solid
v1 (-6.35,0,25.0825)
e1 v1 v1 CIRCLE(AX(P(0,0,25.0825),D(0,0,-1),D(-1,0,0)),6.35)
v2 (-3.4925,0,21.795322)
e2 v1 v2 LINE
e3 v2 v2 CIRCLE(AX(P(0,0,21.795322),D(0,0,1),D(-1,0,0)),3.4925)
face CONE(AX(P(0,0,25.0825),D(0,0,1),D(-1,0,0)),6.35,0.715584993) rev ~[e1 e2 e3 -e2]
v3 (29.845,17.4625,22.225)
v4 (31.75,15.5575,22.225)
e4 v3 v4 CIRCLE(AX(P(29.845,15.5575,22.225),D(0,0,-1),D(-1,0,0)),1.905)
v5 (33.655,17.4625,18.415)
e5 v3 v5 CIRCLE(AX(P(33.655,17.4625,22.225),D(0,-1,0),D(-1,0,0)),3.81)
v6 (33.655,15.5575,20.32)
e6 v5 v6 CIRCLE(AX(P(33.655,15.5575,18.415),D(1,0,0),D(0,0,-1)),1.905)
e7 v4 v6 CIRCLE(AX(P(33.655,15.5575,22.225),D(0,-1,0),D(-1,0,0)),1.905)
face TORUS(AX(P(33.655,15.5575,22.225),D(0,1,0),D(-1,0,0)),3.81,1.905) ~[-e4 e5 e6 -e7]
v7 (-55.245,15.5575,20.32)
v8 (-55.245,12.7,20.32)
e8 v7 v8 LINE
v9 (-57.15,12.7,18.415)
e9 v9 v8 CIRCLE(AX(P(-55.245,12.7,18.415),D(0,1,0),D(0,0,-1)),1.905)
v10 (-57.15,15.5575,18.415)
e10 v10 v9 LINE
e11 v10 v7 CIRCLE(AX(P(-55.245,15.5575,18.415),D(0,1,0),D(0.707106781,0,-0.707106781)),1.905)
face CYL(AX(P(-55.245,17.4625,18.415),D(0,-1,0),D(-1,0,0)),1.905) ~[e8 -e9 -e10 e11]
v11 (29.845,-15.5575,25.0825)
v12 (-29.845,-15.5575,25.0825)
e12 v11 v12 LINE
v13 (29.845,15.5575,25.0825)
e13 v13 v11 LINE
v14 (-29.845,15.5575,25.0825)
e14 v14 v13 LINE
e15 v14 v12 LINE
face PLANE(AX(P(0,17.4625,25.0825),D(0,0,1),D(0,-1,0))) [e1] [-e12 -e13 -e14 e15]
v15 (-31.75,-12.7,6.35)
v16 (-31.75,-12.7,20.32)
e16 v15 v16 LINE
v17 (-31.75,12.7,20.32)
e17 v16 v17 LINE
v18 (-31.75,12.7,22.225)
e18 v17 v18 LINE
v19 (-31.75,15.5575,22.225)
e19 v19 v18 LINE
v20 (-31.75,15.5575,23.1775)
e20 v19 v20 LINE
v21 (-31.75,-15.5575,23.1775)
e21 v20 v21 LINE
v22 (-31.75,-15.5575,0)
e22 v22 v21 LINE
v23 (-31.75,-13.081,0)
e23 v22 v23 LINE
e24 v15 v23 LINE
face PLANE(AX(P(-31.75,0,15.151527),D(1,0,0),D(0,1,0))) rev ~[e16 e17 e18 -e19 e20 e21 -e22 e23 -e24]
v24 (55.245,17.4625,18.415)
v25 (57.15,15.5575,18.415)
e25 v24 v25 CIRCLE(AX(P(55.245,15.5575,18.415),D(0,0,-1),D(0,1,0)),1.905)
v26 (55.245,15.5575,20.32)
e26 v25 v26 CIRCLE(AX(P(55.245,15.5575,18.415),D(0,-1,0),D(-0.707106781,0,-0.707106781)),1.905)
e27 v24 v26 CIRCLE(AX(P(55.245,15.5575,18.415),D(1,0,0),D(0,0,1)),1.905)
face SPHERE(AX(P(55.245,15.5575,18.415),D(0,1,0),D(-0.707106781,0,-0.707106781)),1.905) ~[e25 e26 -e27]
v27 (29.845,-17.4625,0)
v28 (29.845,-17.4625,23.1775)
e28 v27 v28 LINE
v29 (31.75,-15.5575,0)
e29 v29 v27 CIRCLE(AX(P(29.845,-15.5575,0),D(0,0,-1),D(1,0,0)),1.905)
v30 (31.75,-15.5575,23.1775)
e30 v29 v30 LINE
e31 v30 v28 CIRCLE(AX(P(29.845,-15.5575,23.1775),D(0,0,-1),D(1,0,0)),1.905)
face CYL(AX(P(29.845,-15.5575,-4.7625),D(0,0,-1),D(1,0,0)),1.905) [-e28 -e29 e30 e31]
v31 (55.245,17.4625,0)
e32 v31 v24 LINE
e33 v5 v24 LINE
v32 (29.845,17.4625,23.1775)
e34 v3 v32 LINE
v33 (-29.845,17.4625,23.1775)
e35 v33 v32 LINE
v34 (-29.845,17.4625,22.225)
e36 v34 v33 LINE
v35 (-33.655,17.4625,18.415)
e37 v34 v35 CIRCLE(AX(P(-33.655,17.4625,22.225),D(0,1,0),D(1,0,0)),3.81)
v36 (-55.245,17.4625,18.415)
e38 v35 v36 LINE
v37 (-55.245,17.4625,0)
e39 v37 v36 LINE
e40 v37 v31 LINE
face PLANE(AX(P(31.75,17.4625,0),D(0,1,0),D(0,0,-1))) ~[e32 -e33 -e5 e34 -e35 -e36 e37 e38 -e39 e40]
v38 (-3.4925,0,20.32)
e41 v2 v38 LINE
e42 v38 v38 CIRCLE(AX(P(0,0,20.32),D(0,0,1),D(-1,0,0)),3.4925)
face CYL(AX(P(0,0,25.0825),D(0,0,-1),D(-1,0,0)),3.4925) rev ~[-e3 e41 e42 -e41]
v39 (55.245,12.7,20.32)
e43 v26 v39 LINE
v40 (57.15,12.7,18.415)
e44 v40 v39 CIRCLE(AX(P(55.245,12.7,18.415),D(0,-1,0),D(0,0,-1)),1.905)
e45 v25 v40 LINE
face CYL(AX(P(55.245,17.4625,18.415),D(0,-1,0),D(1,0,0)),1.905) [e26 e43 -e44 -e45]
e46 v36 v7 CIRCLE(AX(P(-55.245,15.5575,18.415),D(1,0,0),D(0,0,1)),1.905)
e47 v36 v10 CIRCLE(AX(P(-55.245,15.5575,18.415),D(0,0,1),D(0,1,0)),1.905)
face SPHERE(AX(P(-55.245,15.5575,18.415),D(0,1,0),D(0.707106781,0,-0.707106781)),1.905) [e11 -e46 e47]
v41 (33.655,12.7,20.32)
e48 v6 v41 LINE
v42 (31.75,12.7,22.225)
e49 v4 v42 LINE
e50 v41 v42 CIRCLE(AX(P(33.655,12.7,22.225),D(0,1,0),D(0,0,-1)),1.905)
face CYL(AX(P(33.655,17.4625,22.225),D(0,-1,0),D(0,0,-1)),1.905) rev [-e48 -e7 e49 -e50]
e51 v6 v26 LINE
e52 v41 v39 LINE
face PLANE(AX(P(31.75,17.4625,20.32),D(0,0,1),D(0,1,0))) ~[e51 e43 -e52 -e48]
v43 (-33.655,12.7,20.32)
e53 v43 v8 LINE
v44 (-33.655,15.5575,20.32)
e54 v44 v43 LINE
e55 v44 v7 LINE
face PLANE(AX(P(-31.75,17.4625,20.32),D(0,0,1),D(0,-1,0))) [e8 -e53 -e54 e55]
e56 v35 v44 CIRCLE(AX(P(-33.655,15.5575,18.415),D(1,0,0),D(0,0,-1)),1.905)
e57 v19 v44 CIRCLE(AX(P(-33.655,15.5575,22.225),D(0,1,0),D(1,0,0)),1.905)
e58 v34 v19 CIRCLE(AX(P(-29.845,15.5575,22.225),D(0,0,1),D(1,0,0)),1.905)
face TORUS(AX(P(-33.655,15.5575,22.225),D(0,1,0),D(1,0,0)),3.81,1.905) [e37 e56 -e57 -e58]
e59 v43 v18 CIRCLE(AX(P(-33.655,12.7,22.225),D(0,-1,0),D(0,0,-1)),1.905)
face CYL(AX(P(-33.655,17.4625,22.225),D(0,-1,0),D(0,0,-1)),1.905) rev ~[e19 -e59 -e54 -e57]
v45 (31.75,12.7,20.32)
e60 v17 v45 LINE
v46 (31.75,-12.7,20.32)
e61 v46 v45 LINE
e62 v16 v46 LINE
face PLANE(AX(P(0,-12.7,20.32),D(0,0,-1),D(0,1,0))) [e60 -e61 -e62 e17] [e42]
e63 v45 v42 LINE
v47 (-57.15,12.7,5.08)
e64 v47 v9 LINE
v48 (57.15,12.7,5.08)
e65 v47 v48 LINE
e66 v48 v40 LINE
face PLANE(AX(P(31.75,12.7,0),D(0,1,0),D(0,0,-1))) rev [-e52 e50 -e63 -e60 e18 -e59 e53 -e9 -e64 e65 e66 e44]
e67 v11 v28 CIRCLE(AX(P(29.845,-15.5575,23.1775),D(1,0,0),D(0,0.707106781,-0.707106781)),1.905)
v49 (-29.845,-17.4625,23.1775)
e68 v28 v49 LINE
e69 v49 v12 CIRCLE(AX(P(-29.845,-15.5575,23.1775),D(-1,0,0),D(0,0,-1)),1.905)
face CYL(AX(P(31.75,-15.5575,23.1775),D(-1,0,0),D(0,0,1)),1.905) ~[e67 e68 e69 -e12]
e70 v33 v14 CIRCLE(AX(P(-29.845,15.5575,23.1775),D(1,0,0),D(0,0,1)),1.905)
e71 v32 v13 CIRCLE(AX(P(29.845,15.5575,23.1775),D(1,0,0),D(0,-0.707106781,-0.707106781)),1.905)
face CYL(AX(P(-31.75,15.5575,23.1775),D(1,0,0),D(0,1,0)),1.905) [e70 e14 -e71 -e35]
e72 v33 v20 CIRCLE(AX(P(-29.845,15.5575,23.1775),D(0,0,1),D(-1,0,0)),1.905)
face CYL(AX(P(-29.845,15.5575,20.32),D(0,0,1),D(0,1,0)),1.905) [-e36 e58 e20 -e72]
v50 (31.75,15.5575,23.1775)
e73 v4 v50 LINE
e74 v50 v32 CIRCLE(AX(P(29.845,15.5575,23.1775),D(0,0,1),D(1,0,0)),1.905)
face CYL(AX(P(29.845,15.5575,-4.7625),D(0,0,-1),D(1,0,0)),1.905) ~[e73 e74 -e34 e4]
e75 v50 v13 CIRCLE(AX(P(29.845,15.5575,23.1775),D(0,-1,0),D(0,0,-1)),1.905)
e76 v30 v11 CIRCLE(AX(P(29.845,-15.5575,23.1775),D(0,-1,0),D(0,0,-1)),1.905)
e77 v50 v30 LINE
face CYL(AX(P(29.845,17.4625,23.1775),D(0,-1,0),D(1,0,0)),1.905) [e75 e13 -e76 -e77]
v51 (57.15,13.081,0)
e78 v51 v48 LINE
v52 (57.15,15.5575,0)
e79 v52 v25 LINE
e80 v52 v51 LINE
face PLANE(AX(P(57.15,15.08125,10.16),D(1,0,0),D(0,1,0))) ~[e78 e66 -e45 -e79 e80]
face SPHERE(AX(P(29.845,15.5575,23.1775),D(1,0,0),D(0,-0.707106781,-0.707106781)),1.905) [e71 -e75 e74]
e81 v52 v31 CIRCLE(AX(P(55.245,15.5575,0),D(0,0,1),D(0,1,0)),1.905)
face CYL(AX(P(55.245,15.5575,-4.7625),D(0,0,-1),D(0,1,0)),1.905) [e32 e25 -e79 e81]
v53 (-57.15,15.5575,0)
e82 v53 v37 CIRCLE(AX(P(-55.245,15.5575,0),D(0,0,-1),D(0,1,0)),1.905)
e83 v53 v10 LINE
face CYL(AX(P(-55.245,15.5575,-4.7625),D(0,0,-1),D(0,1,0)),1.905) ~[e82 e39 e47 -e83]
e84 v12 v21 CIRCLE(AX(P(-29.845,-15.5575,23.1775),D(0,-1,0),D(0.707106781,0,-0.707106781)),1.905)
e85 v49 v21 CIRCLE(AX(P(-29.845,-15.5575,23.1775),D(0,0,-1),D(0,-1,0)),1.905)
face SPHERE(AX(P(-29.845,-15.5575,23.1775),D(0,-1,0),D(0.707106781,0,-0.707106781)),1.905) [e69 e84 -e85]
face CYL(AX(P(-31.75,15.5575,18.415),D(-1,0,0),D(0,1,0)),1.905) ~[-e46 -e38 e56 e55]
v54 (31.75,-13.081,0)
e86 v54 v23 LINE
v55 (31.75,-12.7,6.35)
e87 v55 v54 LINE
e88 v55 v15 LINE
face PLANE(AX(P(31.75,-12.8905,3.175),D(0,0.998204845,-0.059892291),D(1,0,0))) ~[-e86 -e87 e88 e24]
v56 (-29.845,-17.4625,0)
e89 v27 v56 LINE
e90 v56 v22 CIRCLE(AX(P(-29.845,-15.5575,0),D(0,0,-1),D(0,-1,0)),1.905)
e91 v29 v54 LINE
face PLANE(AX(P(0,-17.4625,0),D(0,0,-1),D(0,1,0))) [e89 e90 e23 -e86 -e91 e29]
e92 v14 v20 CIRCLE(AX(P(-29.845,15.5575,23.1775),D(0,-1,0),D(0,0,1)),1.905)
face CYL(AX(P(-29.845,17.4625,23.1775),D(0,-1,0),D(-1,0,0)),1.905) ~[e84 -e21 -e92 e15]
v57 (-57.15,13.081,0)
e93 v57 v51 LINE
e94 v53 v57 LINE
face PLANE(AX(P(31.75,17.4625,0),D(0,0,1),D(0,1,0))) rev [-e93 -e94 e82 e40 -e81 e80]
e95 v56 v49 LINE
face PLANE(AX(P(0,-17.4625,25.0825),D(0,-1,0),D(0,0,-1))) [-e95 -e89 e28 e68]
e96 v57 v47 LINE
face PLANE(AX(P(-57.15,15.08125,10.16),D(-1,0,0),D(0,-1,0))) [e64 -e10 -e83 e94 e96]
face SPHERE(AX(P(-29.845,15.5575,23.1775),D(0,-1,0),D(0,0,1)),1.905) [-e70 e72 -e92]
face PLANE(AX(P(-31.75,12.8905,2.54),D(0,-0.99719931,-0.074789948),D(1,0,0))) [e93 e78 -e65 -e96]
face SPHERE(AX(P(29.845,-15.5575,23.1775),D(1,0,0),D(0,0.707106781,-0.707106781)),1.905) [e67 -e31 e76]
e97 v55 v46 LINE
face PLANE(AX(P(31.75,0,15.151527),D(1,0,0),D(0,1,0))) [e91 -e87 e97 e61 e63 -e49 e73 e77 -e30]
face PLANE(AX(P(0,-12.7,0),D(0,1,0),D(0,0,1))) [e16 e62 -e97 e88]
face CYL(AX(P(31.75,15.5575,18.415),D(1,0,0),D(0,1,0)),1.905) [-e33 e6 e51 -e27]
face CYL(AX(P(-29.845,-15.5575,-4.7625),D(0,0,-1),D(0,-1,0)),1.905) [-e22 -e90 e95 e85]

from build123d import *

# Parameters (mm, degrees)
F1_DEPTH       = 31.75
F4_D           = 6.985
F4_DEPTH       = 12.7
F4_CSINK_D     = 12.7
F4_CSINK_ANGLE = 82
F4_TIP         = 2.098505712
F5_SIZE2       = 0.381
F5_SIZE        = 6.35
F2_W           = 4.7625
F2_H           = 20.32
F6_DEPTH       = 25.4
F7_SIZE2       = 5.08
F7_SIZE        = 0.381
F8_R           = 1.905
F9_T1_DEPTH    = 23.1775
F9_T3_DEPTH    = 27.94
F9_S7_W        = 1.905
F9_S7_H        = 1.905
F9_T8_DEPTH    = 1.905
F9_S13_W       = 1.905
F9_S13_H       = 1.905
F9_T14_DEPTH   = 1.905
F9_S19_W       = 1.905
F9_S19_H       = 1.905
F9_T20_DEPTH   = 1.905
F9_S25_W       = 1.905
F9_S25_H       = 1.905
F9_T26_DEPTH   = 1.905


# Not quite as in the source:
# - a fillet or chamfer that OpenCascade refuses, or shapes differently, is made with other operations: its cross-section is extruded or revolved along the edge and cut away or added


with BuildPart() as f1:
    # F0 (on Right) → F1 (new body, symmetric)
    with BuildSketch(Plane.YZ):
        Polygon((-12.7, 0), (-12.7, 20.32), (12.7, 20.32), (12.7, 0), (17.4625, 0), (17.4625, 25.0825), (-17.4625, 25.0825), (-17.4625, 0), align=None)
    extrude(amount=F1_DEPTH, both=True)

    # F4
    with Locations(Plane.XY.offset(25.0825)):
        with Locations((0, 0)):
            CounterSinkHole(F4_D / 2, F4_CSINK_D / 2, depth=F4_DEPTH, counter_sink_angle=F4_CSINK_ANGLE)
            with Locations((0, 0, -(F4_DEPTH + F4_TIP / 2))):  # 118° drill point
                Cone(0, F4_D / 2, F4_TIP, mode=Mode.SUBTRACT)

    # F5
    f5_edges = [f1.edges().sort_by_distance(p)[0] for p in [
        (0, -12.7, 0),
    ]]
    f5_side = f1.faces().sort_by_distance((0, -12.7, 10.16))[0]
    chamfer(f5_edges, length=F5_SIZE, length2=F5_SIZE2, reference=f5_side)

    # F2 (on face) → F6 (join)
    with BuildSketch(Plane(origin=(-31.75, 0, 0), x_dir=(0, -1, 0), z_dir=(-1, 0, 0))):
        with Locations((-15.08125, 10.16)):
            Rectangle(F2_W, F2_H)
    extrude(amount=F6_DEPTH)

    # F7
    f7_edges = [f1.edges().sort_by_distance(p)[0] for p in [
        (-12.7, 12.7, 0),
    ]]
    chamfer(f7_edges, length=F7_SIZE, length2=F7_SIZE2)

    # F8
    f8_edges = [f1.edges().sort_by_distance(p)[0] for p in [
        (-31.75, 0, 25.0825),
        (-31.75, 15.08125, 20.32),
        (-57.15, 15.08125, 20.32),
        (31.75, 0, 25.0825),
        (0, 17.4625, 25.0825),
        (-31.75, 17.4625, 22.70125),
        (-44.45, 17.4625, 20.32),
        (0, -17.4625, 25.0825),
    ]]
    fillet(f8_edges, radius=F8_R)

    # F9: fillet of radius 1.905 on 4 edges, made by hand

    # F9_s2 → F9_t1 (cut)
    with BuildSketch(Plane.XY.offset(-4.7625)):
        with BuildLine():
            ThreePointArc((-55.245, 17.4625), (-56.5920384182, 16.9045384182), (-57.15, 15.5575))
            Line((-57.15, 15.5575), (-57.15, 17.4625))
            Line((-57.15, 17.4625), (-55.245, 17.4625))
        make_face()
    extrude(amount=F9_T1_DEPTH, mode=Mode.SUBTRACT)

    # F9_s4 → F9_t3 (cut)
    with BuildSketch(Plane.XY.offset(-4.7625)):
        with BuildLine():
            ThreePointArc((31.75, 15.5575), (31.1920384182, 16.9045384182), (29.845, 17.4625))
            Line((29.845, 17.4625), (31.75, 17.4625))
            Line((31.75, 17.4625), (31.75, 15.5575))
        make_face()
        with BuildLine():
            ThreePointArc((-29.845, -17.4625), (-31.1920384182, -16.9045384182), (-31.75, -15.5575))
            Line((-31.75, -15.5575), (-31.75, -17.4625))
            Line((-31.75, -17.4625), (-29.845, -17.4625))
        make_face()
        with BuildLine():
            ThreePointArc((31.75, -15.5575), (31.1920384182, -16.9045384182), (29.845, -17.4625))
            Line((29.845, -17.4625), (31.75, -17.4625))
            Line((31.75, -17.4625), (31.75, -15.5575))
        make_face()
    extrude(amount=F9_T3_DEPTH, mode=Mode.SUBTRACT)


with BuildPart() as f9_tool6:
    # F9_s7 → F9_t8 (new body)
    with BuildSketch(Plane.YZ.offset(29.845)):
        with Locations((-16.51, 24.13)):
            Rectangle(F9_S7_W, F9_S7_H)
    extrude(amount=F9_T8_DEPTH)

    # F9_s9 → F9_t10 (revolve, cut)
    with BuildSketch(Plane(origin=(29.845, -15.5575, 23.1775), x_dir=(0, 0.7071067812, -0.7071067812), z_dir=(0, -0.7071067812, -0.7071067812))):
        with BuildLine():
            ThreePointArc((0, -1.905), (1.905, 0), (0, 1.905))
            Line((0, 1.905), (0, -1.905))
        make_face()
    revolve(axis=Axis((29.845, -15.5575, 23.1775), (1, 0, 0)), mode=Mode.SUBTRACT)


with BuildPart() as f1_1:
    add(f1.part)

    # F9_t5: cut F9_tool6
    add(f9_tool6.part, mode=Mode.SUBTRACT)


with BuildPart() as f9_tool12:
    # F9_s13 → F9_t14 (new body)
    with BuildSketch(Plane.XZ.offset(15.5575)):
        with Locations((-30.7975, 24.13)):
            Rectangle(F9_S13_W, F9_S13_H)
    extrude(amount=F9_T14_DEPTH)

    # F9_s15 → F9_t16 (revolve, cut)
    with BuildSketch(Plane(origin=(-29.845, -15.5575, 23.1775), x_dir=(0.7071067812, 0, -0.7071067812), z_dir=(-0.7071067812, 0, -0.7071067812))):
        with BuildLine():
            ThreePointArc((0, -1.905), (1.905, 0), (0, 1.905))
            Line((0, 1.905), (0, -1.905))
        make_face()
    revolve(axis=Axis((-29.845, -15.5575, 23.1775), (0, -1, 0)), mode=Mode.SUBTRACT)


with BuildPart() as f1_2:
    add(f1_1.part)

    # F9_t11: cut F9_tool12
    add(f9_tool12.part, mode=Mode.SUBTRACT)


with BuildPart() as f9_tool18:
    # F9_s19 → F9_t20 (new body)
    with BuildSketch(Plane.YZ.offset(29.845)):
        with Locations((16.51, 24.13)):
            Rectangle(F9_S19_W, F9_S19_H)
    extrude(amount=F9_T20_DEPTH)

    # F9_s21 → F9_t22 (revolve, cut)
    with BuildSketch(Plane(origin=(29.845, 15.5575, 23.1775), x_dir=(0, -0.7071067812, -0.7071067812), z_dir=(0, -0.7071067812, 0.7071067812))):
        with BuildLine():
            ThreePointArc((0, -1.905), (1.905, 0), (0, 1.905))
            Line((0, 1.905), (0, -1.905))
        make_face()
    revolve(axis=Axis((29.845, 15.5575, 23.1775), (1, 0, 0)), mode=Mode.SUBTRACT)


with BuildPart() as f1_3:
    add(f1_2.part)

    # F9_t17: cut F9_tool18
    add(f9_tool18.part, mode=Mode.SUBTRACT)


with BuildPart() as f9_tool24:
    # F9_s25 → F9_t26 (new body)
    with BuildSketch(Plane.XZ.offset(-15.5575)):
        with Locations((-56.1975, 19.3675)):
            Rectangle(F9_S25_W, F9_S25_H)
    extrude(amount=-F9_T26_DEPTH)

    # F9_s27 → F9_t28 (revolve, cut)
    with BuildSketch(Plane(origin=(-55.245, 15.5575, 18.415), x_dir=(0.7071067812, 0, -0.7071067812), z_dir=(0.7071067812, 0, 0.7071067812))):
        with BuildLine():
            ThreePointArc((0, -1.905), (1.905, 0), (0, 1.905))
            Line((0, 1.905), (0, -1.905))
        make_face()
    revolve(axis=Axis((-55.245, 15.5575, 18.415), (0, 1, 0)), mode=Mode.SUBTRACT)


with BuildPart() as f1_4:
    add(f1_3.part)

    # F9_t23: cut F9_tool24
    add(f9_tool24.part, mode=Mode.SUBTRACT)

    # F10: F1 across plane


with BuildPart() as f1_5:
    add(f1_4.part)
    add(f1_4.part.mirror(Plane.YZ))


solid = f1_5.part
